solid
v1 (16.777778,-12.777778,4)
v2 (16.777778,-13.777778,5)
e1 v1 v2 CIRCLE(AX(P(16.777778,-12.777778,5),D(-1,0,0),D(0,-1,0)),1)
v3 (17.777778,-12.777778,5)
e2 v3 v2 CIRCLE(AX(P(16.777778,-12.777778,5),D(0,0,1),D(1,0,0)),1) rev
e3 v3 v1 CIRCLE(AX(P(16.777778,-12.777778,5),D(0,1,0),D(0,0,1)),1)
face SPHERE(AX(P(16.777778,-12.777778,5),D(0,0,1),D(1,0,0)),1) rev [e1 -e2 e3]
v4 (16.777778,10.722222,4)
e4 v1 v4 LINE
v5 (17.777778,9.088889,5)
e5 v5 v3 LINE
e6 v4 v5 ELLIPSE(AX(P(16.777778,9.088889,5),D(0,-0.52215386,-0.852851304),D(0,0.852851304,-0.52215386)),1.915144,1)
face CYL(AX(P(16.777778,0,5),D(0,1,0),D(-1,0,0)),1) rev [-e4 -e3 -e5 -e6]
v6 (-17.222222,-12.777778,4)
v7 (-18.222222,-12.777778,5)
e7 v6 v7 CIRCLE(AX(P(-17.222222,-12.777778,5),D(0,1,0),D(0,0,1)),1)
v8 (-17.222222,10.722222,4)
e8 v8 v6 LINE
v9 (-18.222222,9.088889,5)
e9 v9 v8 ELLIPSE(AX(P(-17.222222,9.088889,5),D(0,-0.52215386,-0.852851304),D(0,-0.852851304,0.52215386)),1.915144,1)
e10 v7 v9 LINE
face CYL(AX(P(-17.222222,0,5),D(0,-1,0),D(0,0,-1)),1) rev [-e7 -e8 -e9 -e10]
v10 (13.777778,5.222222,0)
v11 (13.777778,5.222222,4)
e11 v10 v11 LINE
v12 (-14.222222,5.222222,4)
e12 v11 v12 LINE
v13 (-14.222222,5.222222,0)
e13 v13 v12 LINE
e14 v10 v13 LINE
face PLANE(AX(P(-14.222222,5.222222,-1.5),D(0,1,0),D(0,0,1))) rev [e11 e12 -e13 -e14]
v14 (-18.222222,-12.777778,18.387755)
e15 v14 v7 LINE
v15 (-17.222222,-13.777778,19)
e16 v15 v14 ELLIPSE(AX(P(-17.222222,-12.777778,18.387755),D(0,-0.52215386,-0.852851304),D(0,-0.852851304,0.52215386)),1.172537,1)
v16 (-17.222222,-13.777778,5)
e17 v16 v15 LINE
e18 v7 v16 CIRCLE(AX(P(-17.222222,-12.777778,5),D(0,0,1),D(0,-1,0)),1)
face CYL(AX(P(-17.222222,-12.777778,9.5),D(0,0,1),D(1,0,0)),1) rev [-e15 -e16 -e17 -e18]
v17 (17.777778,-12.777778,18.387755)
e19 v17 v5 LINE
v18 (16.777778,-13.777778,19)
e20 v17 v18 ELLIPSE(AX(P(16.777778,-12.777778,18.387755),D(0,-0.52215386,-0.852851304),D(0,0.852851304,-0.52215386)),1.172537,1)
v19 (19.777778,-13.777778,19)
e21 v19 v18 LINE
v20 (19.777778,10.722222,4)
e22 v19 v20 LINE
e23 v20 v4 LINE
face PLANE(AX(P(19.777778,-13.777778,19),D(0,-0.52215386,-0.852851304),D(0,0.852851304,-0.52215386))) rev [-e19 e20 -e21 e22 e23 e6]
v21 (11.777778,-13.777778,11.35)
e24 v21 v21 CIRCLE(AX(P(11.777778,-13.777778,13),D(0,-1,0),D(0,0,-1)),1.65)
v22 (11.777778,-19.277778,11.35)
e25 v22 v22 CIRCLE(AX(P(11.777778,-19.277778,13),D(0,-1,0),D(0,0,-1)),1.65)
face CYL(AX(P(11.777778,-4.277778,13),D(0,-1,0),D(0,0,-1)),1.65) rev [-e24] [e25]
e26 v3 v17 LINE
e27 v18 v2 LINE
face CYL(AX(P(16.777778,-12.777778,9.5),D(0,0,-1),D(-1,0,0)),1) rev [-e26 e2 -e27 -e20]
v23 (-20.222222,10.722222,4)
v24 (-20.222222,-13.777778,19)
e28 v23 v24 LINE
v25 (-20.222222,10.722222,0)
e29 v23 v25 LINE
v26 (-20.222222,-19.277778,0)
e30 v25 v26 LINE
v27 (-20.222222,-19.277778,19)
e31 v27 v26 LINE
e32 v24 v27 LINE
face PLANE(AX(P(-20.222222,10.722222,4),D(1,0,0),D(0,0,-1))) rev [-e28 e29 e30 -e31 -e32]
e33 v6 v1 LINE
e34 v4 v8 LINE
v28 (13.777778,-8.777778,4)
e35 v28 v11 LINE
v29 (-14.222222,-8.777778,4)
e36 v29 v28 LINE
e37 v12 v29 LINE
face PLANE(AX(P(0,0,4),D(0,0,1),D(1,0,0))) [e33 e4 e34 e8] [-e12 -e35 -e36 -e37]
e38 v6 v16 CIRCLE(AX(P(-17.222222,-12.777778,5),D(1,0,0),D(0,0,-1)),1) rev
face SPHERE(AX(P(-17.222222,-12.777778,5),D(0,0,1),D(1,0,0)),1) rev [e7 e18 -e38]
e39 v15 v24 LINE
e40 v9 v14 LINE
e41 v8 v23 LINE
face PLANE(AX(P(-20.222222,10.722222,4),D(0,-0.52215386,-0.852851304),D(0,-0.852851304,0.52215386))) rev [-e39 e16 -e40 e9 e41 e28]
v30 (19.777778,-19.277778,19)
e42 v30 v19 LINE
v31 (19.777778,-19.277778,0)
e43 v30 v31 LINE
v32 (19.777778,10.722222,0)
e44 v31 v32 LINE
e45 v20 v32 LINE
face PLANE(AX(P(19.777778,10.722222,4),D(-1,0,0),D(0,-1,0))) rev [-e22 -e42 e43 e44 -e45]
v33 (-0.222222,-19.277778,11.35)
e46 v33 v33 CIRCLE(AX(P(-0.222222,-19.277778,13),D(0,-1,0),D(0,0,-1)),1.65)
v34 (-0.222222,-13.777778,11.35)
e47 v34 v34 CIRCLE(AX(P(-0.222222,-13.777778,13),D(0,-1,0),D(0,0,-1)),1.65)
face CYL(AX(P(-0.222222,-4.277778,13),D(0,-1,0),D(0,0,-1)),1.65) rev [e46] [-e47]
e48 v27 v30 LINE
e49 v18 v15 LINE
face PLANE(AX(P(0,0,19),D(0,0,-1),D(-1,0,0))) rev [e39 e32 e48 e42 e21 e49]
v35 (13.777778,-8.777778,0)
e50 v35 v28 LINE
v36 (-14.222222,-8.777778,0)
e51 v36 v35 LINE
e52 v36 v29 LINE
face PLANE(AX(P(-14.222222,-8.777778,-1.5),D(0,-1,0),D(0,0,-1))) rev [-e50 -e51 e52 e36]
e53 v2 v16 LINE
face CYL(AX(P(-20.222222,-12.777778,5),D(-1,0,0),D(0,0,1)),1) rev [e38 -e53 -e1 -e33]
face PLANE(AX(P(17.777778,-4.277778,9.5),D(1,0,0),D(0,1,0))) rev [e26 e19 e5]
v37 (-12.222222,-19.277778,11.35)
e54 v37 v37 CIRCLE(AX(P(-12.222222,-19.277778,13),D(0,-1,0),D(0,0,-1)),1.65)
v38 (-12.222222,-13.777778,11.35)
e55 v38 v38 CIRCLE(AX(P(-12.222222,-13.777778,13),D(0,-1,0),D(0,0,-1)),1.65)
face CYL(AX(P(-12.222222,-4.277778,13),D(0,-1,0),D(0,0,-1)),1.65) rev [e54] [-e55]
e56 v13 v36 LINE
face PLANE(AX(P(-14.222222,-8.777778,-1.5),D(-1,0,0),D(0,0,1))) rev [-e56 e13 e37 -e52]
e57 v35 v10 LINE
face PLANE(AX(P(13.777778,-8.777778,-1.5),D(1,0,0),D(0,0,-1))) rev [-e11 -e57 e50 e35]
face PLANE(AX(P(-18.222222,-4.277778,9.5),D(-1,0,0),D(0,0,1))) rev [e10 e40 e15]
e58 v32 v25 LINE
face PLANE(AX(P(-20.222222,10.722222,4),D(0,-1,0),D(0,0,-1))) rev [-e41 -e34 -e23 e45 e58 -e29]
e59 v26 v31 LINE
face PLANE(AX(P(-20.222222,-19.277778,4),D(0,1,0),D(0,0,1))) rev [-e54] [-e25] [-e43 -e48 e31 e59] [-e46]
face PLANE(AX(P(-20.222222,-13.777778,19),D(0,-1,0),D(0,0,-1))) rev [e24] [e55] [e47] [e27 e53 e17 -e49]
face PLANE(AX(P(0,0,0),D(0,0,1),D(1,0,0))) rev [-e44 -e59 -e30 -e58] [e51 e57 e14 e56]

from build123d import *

# Parameters (mm, degrees)
SKETCH1_W           = 40
SKETCH1_H           = 30
BOSS_EXTRUDE1_DEPTH = 4
SKETCH4_W           = 28
SKETCH4_H           = 14
CUT_EXTRUDE1_DEPTH  = 5.5
SKETCH5_W           = 40
SKETCH5_H           = 5.5
BOSS_EXTRUDE2_DEPTH = 15
SKETCH6_R           = 1.65
CUT_EXTRUDE3_DEPTH  = 15
RIB1_REACH          = 50.297
SKETCH8_WALL_W      = 127.321837908
SKETCH8_WALL_H      = 2
RIB14_REACH         = 50.297
SKETCH11_WALL_W     = 127.321837908
SKETCH11_WALL_H     = 2
FILLET1_R           = 1


with BuildPart() as part:
    # Sketch1 → Boss-Extrude1 (new body)
    with BuildSketch(Plane.XY):
        with Locations((-0.222222222, -4.277777778)):
            Rectangle(SKETCH1_W, SKETCH1_H)
    extrude(amount=BOSS_EXTRUDE1_DEPTH)

    # Sketch4 → Cut-Extrude1 (cut)
    with BuildSketch(Plane.XY.offset(4)):
        with Locations((-0.222222222, -1.777777778)):
            Rectangle(SKETCH4_W, SKETCH4_H)
    extrude(amount=-CUT_EXTRUDE1_DEPTH, mode=Mode.SUBTRACT)

    # Sketch5 → Boss-Extrude2 (add)
    with BuildSketch(Plane.XY.offset(4)):
        with Locations((-0.222222222, -16.527777778)):
            Rectangle(SKETCH5_W, SKETCH5_H)
    extrude(amount=BOSS_EXTRUDE2_DEPTH)

    # Sketch6 → Cut-Extrude3 (cut)
    with BuildSketch(Plane.XZ.offset(19.277777778)):
        with Locations((-12.222222222, 13)):
            Circle(SKETCH6_R)
        with Locations((-0.222222222, 13)):
            Circle(SKETCH6_R)
        with Locations((11.777777778, 13)):
            Circle(SKETCH6_R)
    extrude(amount=-CUT_EXTRUDE3_DEPTH, mode=Mode.SUBTRACT)

    # Sketch8 wall → Rib1 (add, up to next)
    with BuildSketch(Plane(origin=(-20.222222222, -1.527777778, 11.5), x_dir=(0, -0.852851304076, 0.522153859639), z_dir=(0, 0.522153859639, 0.852851304076)), mode=Mode.PRIVATE) as rib1_sk1:
        with Locations((0, 1)):
            Rectangle(SKETCH8_WALL_W, SKETCH8_WALL_H)
    rib1_tool1 = extrude(rib1_sk1.sketch, amount=-RIB1_REACH, mode=Mode.PRIVATE) - part.part
    add(rib1_tool1.solids().sort_by_distance((-20.222222222, -1.527777778, 11.5))[0])

    # Sketch11 wall → Rib14 (add, up to next)
    with BuildSketch(Plane(origin=(19.777777778, -1.527777778, 11.5), x_dir=(0, 0.852851304076, -0.522153859639), z_dir=(0, 0.522153859639, 0.852851304076)), mode=Mode.PRIVATE) as rib14_sk1:
        with Locations((0, 1)):
            Rectangle(SKETCH11_WALL_W, SKETCH11_WALL_H)
    rib14_tool1 = extrude(rib14_sk1.sketch, amount=-RIB14_REACH, mode=Mode.PRIVATE) - part.part
    add(rib14_tool1.solids().sort_by_distance((19.777777778, -1.527777778, 11.5))[0])

    # Fillet1
    fillet1_edges = [part.edges().sort_by_distance(p)[0] for p in [
        (17.777777778, -13.777777778, 11.5),
        (-18.222222222, -13.777777778, 11.5),
        (-0.222222222, -13.777777778, 4),
        (17.777777778, -1.527777778, 4),
        (-18.222222222, -1.527777778, 4),
    ]]
    fillet(fillet1_edges, radius=FILLET1_R)


solid = part.part
